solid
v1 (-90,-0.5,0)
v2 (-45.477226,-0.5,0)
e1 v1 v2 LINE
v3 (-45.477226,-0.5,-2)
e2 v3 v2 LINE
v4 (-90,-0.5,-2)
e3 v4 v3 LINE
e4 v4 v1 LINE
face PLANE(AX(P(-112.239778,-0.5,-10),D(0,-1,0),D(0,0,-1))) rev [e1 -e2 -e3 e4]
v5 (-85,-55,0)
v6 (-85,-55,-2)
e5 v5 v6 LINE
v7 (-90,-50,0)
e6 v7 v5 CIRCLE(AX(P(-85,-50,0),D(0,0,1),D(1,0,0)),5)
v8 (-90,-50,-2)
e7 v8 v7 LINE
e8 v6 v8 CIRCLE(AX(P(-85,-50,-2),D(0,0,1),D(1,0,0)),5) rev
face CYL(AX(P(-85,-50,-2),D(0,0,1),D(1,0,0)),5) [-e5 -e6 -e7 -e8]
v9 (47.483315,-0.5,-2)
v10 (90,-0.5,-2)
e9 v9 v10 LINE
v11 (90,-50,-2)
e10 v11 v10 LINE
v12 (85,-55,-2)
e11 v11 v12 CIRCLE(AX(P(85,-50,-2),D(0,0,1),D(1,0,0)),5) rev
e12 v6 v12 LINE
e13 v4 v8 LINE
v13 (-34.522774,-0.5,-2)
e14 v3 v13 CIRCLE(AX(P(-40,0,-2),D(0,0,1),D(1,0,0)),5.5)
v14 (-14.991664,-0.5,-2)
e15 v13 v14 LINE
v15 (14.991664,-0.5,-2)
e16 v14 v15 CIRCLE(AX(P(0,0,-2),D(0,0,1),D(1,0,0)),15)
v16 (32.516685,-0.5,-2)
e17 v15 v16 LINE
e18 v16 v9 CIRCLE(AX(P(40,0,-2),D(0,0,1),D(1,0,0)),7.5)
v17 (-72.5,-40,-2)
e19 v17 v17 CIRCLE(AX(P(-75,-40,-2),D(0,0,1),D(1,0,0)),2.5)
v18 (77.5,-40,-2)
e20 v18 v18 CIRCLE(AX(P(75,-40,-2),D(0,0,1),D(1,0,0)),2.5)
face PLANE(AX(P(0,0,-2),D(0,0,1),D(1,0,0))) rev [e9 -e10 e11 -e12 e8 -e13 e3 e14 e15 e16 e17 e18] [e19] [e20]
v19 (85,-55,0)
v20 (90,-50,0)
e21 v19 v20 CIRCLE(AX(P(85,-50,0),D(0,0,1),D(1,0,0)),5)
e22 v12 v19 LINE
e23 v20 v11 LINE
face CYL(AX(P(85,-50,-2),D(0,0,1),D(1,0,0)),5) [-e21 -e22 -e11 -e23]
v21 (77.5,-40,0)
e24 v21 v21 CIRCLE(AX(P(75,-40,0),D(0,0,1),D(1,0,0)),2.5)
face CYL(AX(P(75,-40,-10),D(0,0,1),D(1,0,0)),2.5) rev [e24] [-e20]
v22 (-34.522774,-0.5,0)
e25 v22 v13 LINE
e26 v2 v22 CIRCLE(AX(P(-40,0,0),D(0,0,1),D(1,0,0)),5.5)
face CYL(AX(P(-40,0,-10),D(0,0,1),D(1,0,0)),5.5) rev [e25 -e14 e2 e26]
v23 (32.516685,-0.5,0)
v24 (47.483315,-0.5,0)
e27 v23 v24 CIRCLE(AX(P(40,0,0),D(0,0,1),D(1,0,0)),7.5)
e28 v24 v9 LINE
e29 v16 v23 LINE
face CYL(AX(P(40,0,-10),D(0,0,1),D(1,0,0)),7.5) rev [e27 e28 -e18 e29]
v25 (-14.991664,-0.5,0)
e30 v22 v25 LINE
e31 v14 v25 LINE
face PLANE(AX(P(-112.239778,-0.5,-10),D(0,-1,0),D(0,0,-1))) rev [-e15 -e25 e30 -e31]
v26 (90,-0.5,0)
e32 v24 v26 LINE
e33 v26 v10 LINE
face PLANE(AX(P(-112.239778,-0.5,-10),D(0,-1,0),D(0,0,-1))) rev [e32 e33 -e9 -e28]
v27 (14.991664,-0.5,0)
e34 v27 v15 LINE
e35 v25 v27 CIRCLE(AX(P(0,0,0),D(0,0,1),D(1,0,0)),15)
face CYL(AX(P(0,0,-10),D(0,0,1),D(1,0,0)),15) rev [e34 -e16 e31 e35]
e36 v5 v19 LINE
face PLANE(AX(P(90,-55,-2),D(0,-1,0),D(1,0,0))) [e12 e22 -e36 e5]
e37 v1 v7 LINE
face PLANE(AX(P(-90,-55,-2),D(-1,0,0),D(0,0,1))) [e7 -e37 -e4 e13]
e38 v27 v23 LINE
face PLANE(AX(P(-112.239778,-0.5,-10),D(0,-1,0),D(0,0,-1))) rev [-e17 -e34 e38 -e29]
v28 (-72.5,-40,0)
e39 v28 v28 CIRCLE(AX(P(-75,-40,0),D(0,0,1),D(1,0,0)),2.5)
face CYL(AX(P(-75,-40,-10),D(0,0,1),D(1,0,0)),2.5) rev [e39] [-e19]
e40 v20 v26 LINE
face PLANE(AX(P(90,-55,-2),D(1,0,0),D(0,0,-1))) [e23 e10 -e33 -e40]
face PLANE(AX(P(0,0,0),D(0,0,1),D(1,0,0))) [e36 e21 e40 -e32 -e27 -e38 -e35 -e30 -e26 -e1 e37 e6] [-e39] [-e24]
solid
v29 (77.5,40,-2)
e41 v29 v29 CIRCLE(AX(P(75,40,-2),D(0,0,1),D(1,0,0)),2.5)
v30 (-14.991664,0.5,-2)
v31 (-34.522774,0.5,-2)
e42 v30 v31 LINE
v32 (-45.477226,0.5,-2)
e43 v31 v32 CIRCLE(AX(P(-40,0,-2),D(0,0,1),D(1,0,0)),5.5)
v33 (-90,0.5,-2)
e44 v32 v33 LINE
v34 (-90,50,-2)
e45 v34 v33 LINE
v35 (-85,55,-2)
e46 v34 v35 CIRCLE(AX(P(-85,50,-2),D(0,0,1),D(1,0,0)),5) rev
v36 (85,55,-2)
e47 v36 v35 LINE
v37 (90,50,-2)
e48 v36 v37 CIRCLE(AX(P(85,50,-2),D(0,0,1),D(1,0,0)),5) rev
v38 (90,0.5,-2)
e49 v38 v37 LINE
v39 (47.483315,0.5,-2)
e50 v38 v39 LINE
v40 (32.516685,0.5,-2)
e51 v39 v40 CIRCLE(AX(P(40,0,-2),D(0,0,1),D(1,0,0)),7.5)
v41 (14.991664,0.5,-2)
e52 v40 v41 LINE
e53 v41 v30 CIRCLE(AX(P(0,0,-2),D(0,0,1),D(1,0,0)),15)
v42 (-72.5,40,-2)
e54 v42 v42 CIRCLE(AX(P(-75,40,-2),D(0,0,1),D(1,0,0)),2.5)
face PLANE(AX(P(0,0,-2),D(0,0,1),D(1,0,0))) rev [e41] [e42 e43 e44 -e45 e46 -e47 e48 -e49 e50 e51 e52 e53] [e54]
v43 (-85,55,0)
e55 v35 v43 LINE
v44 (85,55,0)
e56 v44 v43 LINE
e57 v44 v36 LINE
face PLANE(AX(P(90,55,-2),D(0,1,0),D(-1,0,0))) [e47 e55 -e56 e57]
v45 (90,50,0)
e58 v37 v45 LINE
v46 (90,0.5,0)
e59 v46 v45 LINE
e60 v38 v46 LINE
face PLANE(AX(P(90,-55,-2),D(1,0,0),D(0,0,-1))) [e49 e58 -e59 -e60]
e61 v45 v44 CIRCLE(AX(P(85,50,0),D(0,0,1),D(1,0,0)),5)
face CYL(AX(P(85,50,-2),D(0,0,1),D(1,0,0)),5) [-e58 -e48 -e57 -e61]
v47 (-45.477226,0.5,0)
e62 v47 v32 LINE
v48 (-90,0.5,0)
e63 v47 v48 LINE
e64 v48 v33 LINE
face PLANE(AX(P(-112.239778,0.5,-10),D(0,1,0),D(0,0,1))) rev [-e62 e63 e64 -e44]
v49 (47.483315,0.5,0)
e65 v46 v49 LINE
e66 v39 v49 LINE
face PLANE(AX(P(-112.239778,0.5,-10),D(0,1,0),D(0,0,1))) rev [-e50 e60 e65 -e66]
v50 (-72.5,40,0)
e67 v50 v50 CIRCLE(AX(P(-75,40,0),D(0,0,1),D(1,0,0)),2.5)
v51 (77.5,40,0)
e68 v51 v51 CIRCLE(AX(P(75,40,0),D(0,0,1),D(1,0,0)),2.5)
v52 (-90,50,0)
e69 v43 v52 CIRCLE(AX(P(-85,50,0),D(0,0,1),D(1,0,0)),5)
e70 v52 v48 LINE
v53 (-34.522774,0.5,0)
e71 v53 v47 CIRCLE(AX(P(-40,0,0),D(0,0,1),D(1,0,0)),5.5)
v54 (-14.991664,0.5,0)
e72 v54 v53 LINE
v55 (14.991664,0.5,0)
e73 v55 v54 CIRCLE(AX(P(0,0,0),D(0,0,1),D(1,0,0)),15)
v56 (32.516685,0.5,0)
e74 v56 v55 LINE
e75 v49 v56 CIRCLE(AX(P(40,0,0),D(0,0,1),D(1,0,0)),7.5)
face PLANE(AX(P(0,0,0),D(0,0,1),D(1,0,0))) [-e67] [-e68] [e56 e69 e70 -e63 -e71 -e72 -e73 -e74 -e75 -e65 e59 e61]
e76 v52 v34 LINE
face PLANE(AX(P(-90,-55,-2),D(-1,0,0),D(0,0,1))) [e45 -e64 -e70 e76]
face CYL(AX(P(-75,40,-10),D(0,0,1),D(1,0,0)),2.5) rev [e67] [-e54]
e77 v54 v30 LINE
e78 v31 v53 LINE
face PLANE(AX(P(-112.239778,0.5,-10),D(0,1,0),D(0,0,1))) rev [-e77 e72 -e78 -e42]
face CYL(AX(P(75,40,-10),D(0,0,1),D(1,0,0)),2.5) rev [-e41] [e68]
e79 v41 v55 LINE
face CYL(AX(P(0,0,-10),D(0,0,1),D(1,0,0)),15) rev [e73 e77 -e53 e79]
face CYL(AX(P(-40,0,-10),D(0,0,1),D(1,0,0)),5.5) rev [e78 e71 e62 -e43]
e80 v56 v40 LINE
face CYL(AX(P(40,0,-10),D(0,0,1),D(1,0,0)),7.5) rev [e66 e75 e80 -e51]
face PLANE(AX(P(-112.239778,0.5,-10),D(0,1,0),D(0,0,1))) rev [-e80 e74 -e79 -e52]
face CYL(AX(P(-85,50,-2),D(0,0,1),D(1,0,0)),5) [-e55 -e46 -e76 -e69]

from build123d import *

# Parameters (mm, degrees)
SKETCH_1_W             = 180
SKETCH_1_H             = 110
SM_BASE_FLANGE_1_DEPTH = 2
SKETCH_6_R             = 15
SKETCH_6_R_2           = 5.5
SKETCH_6_R_3           = 7.5
CUT_EXTRUDE_1_DEPTH    = 10
FILLET_1_R             = 5
SKETCH_7_W             = 224.479555932
SKETCH_7_H             = 1
CUT_EXTRUDE_2_DEPTH    = 10
SKETCH_8_R             = 2.5
CUT_EXTRUDE_3_DEPTH    = 10


# Sheet-metal steps are written as plain solids
with BuildPart() as part:
    # Sketch 1 → 基体-法兰1 (new body)
    with BuildSketch(Plane.XY):
        Rectangle(SKETCH_1_W, SKETCH_1_H)
    extrude(amount=-SM_BASE_FLANGE_1_DEPTH)

    # 草图6 → 切除-拉伸1 (cut)
    with BuildSketch(Plane.XY):
        Circle(SKETCH_6_R)
        with Locations((-40, 0)):
            Circle(SKETCH_6_R_2)
        with Locations((40, 0)):
            Circle(SKETCH_6_R_3)
    extrude(amount=-CUT_EXTRUDE_1_DEPTH, mode=Mode.SUBTRACT)

    # 圆角1
    fillet_1_edges = [part.edges().sort_by_distance(p)[0] for p in [
        (-90, 55, -1),
        (90, 55, -1),
        (90, -55, -1),
        (-90, -55, -1),
    ]]
    fillet(fillet_1_edges, radius=FILLET_1_R)

    # 草图7 → 切除-拉伸2 (cut)
    with BuildSketch(Plane.XY):
        Rectangle(SKETCH_7_W, SKETCH_7_H)
    extrude(amount=-CUT_EXTRUDE_2_DEPTH, mode=Mode.SUBTRACT)


with BuildPart() as cut_extrude_2_piece_1:
    # of the separate pieces the step leaves, piece 1, a body of its own (cut_extrude_2_pieces)
    add(part.part.solids().sort_by_distance((85, -55, 0))[0])


with BuildPart() as cut_extrude_2_piece_2:
    # of the separate pieces the step leaves, piece 2, a body of its own (cut_extrude_2_pieces)
    add(part.part.solids().sort_by_distance((90, 50, 0))[0])


with BuildPart() as cut_extrude_3_tool:
    # 草图8 → 切除-拉伸3 (new body)
    with BuildSketch(Plane.XY):
        with Locations((75, 40)):
            Circle(SKETCH_8_R)
        with Locations((-75, 40)):
            Circle(SKETCH_8_R)
        with Locations((-75, -40)):
            Circle(SKETCH_8_R)
        with Locations((75, -40)):
            Circle(SKETCH_8_R)
    extrude(amount=-CUT_EXTRUDE_3_DEPTH)


with BuildPart() as cut_extrude_2_piece_1_1:
    add(cut_extrude_2_piece_1.part)

    # 切除-拉伸3: cut by cut_extrude_3_tool
    add(cut_extrude_3_tool.part, mode=Mode.SUBTRACT)


with BuildPart() as cut_extrude_2_piece_2_1:
    add(cut_extrude_2_piece_2.part)

    # 切除-拉伸3: cut by cut_extrude_3_tool
    add(cut_extrude_3_tool.part, mode=Mode.SUBTRACT)


solid = Compound([cut_extrude_2_piece_1_1.part, cut_extrude_2_piece_2_1.part])
